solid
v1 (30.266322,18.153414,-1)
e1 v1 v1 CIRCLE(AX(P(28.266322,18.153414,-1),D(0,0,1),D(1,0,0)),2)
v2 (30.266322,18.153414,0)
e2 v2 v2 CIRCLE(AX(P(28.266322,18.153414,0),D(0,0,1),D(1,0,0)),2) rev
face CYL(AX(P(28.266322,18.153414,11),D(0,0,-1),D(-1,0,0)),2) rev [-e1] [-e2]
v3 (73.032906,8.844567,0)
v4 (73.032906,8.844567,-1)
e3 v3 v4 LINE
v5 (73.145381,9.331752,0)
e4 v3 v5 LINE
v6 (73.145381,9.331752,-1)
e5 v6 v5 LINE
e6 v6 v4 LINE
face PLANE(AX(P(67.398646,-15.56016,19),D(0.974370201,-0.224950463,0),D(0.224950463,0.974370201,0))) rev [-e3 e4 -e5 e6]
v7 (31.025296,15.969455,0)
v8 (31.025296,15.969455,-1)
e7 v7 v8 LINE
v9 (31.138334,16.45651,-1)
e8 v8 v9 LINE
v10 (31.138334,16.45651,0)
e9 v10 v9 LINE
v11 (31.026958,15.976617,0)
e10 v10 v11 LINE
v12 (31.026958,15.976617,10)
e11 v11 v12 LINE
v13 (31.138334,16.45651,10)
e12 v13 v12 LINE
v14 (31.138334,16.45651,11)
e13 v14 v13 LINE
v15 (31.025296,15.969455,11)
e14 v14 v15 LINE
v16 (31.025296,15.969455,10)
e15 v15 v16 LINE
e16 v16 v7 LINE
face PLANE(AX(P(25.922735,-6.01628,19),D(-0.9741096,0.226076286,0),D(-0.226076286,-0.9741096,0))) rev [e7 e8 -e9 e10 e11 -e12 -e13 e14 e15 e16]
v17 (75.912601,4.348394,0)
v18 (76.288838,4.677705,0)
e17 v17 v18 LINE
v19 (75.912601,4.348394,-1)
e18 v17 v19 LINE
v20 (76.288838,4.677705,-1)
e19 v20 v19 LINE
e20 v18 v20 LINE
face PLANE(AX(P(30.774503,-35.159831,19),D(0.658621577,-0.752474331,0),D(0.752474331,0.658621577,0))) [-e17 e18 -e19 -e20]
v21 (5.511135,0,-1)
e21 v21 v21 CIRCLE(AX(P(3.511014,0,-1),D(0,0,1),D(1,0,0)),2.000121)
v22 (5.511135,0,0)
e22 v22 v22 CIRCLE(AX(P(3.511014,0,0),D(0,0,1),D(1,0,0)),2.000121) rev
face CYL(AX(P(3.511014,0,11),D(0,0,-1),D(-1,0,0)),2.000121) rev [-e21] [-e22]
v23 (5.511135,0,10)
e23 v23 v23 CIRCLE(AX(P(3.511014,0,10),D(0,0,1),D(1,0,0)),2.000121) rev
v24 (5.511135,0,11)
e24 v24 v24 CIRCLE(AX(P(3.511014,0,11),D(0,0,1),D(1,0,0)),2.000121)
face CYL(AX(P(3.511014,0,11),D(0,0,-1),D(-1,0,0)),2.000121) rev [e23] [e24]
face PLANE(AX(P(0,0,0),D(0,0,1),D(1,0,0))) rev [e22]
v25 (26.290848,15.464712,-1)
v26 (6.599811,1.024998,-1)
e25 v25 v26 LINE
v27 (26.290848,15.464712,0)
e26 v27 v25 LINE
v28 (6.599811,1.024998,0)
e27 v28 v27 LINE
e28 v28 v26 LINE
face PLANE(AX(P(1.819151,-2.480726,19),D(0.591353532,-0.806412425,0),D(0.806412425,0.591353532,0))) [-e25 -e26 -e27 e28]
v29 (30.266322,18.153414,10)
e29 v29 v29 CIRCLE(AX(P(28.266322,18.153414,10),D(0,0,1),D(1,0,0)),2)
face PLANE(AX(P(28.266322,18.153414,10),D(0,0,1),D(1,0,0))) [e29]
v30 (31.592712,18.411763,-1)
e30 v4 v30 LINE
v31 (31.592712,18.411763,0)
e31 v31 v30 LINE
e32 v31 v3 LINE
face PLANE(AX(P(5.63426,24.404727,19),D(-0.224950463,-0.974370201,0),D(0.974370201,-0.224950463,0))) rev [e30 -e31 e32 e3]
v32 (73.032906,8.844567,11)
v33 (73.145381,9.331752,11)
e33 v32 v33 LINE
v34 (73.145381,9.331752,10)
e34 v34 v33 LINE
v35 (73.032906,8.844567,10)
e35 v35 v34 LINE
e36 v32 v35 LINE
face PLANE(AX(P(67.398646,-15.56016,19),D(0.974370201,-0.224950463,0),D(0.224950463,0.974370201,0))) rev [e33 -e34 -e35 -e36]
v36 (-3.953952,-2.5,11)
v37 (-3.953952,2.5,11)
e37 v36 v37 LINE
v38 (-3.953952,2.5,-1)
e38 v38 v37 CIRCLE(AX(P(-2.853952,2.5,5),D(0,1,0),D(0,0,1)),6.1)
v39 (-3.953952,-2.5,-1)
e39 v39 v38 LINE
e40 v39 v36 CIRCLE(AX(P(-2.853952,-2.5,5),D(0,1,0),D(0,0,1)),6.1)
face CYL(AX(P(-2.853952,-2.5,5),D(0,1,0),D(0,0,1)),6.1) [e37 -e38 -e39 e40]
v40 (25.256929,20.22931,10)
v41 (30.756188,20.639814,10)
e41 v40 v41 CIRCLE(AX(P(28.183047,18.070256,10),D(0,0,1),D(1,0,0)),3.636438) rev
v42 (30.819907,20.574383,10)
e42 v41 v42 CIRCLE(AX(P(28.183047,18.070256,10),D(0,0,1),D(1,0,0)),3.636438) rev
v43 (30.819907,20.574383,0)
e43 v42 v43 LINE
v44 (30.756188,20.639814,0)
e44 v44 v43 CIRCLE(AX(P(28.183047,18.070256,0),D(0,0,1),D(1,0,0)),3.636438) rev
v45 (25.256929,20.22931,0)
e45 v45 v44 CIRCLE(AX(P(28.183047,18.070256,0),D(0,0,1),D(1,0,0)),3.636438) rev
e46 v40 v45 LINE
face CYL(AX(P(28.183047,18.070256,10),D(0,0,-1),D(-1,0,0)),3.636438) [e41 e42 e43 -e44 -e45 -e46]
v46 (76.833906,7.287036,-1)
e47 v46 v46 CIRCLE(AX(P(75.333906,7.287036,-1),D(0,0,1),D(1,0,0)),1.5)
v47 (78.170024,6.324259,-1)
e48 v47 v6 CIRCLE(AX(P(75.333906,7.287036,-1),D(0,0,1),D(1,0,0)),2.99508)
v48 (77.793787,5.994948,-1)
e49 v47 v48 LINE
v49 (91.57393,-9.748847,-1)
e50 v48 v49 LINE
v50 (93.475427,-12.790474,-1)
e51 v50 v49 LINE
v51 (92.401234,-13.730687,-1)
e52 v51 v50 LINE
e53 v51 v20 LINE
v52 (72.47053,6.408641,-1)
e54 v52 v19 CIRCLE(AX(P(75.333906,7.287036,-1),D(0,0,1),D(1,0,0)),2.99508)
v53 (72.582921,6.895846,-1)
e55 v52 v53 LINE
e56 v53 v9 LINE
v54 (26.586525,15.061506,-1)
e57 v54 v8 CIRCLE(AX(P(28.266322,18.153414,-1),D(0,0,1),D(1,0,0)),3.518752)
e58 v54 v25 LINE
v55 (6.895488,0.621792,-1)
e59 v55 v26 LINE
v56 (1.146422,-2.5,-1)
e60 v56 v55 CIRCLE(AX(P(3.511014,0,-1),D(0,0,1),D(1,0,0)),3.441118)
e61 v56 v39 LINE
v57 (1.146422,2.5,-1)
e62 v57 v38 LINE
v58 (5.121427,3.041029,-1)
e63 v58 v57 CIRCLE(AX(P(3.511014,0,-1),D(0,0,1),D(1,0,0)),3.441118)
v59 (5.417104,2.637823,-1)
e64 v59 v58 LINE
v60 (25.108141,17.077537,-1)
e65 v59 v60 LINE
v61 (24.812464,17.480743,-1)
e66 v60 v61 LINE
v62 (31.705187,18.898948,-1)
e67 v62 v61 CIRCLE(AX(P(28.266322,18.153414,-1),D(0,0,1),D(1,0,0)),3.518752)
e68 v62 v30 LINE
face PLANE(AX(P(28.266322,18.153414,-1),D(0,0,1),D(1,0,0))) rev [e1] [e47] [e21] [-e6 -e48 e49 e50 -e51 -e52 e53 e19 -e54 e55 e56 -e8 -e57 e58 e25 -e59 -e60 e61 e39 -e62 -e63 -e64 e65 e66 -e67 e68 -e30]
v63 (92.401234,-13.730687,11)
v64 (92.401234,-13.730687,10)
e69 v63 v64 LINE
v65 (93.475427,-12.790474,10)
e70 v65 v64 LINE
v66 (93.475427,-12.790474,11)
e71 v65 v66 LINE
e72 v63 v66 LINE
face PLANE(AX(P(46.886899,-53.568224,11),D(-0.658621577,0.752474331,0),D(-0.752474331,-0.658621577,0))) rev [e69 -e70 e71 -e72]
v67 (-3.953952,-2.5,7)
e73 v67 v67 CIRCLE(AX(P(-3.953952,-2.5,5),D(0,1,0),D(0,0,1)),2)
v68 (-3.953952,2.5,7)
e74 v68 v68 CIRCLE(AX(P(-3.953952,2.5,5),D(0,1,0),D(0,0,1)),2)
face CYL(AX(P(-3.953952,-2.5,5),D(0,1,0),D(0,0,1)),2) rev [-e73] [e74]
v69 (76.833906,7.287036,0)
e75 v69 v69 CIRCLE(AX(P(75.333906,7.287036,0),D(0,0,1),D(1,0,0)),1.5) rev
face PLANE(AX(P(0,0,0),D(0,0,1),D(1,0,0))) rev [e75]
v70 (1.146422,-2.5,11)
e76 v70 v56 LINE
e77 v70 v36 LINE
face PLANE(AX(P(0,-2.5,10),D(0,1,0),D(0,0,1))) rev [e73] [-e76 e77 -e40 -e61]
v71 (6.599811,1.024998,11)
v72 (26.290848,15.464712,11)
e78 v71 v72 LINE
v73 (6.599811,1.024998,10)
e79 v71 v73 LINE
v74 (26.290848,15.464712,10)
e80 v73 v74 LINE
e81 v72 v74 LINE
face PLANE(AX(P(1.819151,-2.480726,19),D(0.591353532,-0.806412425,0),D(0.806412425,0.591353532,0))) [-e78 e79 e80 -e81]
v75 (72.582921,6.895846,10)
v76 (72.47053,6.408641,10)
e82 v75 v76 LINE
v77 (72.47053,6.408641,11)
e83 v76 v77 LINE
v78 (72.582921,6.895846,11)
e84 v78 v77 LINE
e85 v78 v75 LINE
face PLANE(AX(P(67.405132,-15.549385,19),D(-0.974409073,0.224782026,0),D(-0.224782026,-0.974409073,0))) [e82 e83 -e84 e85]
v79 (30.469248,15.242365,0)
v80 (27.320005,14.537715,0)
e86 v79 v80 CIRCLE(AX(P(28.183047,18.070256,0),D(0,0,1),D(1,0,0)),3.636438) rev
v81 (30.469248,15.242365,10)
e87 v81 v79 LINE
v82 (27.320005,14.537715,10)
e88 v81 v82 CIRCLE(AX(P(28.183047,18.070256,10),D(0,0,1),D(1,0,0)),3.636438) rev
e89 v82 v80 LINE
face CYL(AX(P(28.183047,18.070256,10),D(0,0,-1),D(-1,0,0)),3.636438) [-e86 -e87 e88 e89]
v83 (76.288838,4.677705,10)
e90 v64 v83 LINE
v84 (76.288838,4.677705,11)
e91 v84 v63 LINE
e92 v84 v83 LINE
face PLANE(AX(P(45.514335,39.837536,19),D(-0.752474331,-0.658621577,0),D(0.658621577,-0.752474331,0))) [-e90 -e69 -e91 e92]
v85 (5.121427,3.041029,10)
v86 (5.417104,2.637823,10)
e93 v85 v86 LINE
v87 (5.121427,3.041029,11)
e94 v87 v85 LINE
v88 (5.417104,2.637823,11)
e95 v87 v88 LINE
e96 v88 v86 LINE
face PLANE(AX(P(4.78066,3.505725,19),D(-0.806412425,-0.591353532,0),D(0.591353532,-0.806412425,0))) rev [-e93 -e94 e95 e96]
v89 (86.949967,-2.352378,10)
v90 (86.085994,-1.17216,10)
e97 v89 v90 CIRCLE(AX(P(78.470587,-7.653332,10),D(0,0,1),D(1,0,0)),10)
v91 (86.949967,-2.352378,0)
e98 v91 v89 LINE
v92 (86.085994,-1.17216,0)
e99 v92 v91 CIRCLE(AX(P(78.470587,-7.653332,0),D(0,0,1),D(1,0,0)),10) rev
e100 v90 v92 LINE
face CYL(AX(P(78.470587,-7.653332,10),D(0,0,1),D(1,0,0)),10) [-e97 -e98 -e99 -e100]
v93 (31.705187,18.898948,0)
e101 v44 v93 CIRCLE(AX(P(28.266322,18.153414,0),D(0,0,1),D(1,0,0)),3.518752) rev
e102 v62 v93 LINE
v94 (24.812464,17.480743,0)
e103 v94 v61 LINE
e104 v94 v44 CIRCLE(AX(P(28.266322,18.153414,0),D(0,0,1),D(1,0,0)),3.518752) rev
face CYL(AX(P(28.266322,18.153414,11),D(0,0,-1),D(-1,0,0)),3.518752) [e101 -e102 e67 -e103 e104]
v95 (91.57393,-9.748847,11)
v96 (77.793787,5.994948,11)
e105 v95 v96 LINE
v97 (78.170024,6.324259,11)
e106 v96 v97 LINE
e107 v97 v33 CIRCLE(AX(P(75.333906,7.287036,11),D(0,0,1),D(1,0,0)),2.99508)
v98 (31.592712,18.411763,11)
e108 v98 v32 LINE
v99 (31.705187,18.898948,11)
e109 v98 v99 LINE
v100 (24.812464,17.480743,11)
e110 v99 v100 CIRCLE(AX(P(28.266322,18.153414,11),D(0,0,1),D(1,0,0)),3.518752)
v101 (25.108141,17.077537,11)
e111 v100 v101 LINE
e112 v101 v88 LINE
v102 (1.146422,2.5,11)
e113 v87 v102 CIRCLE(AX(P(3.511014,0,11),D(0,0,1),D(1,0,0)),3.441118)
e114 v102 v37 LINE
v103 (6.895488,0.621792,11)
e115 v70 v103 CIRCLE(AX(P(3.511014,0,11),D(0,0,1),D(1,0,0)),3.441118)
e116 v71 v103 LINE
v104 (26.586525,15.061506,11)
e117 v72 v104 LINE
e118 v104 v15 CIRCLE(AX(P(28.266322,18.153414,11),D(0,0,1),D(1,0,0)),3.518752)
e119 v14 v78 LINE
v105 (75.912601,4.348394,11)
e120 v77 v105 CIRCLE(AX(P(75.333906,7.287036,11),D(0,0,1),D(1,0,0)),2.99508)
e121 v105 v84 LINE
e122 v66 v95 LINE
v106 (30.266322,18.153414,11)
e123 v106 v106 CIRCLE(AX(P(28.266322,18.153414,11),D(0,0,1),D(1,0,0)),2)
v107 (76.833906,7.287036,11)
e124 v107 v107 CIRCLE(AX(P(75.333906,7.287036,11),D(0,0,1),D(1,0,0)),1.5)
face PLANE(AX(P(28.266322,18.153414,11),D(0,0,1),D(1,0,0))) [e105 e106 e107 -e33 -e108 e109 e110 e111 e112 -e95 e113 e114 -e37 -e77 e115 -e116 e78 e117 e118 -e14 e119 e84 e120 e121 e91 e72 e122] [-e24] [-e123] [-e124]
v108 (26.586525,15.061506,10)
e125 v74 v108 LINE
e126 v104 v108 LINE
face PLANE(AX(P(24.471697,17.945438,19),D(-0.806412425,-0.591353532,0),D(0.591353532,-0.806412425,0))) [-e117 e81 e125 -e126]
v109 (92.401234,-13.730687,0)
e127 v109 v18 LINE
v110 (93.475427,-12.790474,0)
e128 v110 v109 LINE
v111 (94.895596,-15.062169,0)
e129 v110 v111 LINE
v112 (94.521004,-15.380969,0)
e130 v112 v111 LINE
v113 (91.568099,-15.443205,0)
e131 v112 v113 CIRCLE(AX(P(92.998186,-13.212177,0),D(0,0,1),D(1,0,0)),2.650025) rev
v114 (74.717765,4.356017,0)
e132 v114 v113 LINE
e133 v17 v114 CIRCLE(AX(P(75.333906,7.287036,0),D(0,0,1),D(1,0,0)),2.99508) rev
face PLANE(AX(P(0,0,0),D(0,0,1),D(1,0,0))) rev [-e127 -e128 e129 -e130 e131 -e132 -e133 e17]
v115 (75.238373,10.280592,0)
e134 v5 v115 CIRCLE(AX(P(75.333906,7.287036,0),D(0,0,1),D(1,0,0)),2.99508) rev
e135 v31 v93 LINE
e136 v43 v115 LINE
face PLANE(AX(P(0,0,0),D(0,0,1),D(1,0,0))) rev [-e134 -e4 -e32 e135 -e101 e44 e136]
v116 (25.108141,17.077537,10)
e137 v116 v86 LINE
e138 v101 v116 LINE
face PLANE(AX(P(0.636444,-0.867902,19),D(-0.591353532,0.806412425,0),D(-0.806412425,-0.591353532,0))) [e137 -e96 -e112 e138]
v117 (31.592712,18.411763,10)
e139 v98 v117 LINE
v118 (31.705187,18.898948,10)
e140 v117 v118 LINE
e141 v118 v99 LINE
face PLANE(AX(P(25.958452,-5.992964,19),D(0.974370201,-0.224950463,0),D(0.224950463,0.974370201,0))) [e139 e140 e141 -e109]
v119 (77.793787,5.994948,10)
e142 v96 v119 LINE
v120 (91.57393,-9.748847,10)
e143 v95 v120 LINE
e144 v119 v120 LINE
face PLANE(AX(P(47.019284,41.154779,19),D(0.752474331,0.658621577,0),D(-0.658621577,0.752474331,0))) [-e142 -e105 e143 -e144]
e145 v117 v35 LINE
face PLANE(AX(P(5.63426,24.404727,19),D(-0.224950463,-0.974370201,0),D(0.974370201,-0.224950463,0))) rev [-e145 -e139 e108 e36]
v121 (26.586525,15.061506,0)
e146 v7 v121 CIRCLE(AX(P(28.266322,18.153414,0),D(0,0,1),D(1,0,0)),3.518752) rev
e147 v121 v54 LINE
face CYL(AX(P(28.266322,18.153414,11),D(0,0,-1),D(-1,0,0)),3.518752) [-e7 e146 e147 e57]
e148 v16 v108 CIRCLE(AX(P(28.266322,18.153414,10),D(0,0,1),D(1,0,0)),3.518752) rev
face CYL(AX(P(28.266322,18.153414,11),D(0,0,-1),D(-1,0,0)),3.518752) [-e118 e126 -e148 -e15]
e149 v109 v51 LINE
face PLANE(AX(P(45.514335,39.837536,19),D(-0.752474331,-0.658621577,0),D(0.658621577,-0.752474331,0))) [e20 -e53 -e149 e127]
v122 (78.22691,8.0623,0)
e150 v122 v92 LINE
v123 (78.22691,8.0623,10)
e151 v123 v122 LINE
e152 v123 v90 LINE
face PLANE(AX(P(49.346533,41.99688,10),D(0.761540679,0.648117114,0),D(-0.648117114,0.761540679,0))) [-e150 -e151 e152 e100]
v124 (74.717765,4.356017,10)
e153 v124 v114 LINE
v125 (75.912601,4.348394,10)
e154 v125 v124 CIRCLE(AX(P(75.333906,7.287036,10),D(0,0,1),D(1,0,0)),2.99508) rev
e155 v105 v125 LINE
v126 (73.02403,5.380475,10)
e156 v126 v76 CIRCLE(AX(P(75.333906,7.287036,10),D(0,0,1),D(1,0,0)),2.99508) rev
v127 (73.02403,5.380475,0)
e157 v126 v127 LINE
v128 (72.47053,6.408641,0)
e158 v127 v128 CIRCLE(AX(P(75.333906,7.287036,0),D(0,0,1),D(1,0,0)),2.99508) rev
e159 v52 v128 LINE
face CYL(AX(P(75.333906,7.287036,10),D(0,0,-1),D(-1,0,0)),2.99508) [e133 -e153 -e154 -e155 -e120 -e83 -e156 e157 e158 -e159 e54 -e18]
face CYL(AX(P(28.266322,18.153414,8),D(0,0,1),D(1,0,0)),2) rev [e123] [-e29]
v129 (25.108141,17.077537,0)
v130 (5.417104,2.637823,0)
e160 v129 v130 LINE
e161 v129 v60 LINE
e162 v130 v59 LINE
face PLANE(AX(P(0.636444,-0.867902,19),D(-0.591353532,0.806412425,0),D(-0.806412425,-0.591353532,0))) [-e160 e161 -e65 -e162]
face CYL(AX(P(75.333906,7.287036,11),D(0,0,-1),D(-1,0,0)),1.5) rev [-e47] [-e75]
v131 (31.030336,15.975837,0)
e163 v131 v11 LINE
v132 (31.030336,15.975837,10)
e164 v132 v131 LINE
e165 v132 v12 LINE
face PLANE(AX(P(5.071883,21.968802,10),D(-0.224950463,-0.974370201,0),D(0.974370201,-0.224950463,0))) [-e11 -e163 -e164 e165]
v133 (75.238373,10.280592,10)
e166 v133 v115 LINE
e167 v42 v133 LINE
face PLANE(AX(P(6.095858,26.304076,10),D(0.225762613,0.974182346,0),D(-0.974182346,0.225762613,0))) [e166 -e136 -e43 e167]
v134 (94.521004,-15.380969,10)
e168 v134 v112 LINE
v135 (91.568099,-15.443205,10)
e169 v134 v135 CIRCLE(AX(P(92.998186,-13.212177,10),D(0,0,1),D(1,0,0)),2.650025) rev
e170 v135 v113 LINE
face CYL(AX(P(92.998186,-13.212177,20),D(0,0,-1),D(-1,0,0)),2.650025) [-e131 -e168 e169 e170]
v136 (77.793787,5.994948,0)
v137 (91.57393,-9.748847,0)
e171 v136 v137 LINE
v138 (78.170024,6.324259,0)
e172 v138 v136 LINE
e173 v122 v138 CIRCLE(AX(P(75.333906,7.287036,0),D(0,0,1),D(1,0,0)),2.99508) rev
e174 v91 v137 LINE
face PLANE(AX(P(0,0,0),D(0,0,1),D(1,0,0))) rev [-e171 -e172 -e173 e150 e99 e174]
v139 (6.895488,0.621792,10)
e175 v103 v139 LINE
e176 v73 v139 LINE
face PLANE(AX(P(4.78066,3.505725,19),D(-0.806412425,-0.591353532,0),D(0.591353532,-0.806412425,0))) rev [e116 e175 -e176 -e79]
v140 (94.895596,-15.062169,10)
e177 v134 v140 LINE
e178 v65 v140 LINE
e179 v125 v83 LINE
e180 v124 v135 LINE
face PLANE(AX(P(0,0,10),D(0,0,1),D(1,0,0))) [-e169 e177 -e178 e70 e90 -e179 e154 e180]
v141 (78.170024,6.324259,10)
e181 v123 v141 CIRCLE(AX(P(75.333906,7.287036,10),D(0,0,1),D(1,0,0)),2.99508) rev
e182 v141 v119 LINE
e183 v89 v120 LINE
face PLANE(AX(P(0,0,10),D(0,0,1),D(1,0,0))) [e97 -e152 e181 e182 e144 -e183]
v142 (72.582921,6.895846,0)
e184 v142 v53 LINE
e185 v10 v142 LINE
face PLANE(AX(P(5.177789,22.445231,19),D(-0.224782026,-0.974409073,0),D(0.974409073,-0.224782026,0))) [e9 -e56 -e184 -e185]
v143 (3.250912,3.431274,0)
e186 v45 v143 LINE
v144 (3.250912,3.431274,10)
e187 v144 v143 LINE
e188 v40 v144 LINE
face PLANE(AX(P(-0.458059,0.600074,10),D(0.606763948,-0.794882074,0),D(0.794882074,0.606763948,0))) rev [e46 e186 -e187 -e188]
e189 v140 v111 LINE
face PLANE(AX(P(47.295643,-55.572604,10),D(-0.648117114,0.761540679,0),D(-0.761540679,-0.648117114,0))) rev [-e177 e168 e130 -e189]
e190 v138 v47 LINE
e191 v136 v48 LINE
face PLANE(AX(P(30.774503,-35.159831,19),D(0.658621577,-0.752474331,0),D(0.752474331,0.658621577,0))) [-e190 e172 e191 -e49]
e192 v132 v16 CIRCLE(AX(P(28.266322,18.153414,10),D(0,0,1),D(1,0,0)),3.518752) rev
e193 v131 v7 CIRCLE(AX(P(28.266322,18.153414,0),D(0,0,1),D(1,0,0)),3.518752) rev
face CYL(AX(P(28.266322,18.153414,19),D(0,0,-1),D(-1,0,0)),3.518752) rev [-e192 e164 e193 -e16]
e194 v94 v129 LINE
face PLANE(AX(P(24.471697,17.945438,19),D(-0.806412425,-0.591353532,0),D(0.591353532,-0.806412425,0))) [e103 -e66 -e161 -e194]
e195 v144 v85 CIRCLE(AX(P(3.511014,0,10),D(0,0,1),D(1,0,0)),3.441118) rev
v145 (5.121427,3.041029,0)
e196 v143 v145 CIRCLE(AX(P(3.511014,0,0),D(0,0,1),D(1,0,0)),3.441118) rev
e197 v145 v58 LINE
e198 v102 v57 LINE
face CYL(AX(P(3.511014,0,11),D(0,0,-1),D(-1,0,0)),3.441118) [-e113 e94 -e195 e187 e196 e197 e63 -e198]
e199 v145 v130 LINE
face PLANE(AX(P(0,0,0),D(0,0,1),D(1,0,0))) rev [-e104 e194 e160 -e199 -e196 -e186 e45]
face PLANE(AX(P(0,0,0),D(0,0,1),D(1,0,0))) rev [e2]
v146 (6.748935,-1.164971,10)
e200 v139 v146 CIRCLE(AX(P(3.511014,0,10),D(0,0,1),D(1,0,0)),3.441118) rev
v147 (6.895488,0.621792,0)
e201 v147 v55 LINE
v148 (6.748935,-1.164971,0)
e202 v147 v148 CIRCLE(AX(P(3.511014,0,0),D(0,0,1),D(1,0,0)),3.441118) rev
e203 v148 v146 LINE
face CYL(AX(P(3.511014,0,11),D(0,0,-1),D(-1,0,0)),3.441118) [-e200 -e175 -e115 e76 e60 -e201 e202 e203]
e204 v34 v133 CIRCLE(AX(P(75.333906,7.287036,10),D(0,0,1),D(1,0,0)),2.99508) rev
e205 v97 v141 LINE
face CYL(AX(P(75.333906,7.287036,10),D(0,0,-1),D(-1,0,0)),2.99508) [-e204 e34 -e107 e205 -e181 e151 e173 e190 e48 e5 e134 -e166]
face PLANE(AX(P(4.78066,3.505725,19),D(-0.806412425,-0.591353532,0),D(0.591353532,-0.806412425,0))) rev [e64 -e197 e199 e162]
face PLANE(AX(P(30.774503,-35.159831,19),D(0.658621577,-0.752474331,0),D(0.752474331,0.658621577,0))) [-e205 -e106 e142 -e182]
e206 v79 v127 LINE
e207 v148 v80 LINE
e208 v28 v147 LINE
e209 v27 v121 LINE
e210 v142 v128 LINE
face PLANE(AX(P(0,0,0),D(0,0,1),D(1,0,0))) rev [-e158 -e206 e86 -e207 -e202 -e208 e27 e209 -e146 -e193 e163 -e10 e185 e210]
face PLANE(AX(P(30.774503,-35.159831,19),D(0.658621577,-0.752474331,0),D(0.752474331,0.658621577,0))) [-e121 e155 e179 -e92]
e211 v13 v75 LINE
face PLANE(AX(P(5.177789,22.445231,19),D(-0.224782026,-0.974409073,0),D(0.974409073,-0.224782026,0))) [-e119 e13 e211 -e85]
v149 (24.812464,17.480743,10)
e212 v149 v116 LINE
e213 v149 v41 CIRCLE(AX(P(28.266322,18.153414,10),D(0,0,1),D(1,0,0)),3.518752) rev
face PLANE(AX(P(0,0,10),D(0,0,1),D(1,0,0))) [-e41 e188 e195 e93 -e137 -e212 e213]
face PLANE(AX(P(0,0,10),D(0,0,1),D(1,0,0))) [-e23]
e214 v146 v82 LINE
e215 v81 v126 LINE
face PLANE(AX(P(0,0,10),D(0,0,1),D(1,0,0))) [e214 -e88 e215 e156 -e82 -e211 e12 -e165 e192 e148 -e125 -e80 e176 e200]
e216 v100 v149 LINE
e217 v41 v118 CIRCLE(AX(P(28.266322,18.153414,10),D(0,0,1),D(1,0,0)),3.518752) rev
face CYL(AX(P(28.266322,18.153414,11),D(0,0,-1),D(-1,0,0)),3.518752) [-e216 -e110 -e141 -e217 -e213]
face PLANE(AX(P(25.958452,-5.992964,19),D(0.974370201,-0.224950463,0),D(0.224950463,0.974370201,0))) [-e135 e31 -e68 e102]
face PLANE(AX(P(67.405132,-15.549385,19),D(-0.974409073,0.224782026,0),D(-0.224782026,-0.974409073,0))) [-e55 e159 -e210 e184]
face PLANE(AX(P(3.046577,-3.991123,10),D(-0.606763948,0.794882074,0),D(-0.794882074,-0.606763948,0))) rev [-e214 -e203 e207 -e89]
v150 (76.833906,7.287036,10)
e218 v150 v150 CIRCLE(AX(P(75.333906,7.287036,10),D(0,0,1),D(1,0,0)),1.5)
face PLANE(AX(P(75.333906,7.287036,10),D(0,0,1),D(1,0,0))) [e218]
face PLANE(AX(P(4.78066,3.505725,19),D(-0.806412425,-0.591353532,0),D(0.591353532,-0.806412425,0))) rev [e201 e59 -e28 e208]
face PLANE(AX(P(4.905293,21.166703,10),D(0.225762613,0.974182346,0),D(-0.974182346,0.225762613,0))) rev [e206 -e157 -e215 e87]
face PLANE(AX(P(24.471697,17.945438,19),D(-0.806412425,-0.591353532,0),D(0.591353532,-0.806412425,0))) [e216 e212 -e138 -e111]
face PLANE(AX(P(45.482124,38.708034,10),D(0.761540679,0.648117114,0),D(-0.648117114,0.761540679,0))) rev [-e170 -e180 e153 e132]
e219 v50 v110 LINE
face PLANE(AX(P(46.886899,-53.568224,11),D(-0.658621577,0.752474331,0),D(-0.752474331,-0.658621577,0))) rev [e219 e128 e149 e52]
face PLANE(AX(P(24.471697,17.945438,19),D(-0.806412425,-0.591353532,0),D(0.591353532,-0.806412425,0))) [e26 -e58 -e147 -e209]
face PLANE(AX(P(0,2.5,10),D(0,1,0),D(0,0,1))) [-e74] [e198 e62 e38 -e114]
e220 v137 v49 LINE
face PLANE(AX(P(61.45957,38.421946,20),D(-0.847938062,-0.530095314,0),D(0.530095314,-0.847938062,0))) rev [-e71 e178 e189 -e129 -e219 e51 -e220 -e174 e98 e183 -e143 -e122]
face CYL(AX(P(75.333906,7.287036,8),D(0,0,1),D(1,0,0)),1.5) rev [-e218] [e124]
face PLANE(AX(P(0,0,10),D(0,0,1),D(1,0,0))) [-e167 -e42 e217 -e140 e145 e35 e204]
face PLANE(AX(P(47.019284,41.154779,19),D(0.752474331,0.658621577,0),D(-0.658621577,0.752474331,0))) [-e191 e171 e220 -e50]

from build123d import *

# Parameters (mm, degrees)
AUFSATZ_LINEAR_AUSTRAGEN1_DEPTH      = 10
SKIZZE2_R                            = 2
SKIZZE2_R_2                          = 1.5
SCHNITT_LINEAR_AUSTRAGEN2_DEPTH      = 2
AUFSATZ_LINEAR_AUSTRAGEN3_DEPTH      = 1
AUFSATZ_LINEAR_AUSTRAGEN3_DEPTH_BACK = 11
SKIZZE3_R                            = 3.518752121
SKIZZE3_R_2                          = 2
SKIZZE3_R_3                          = 2.995079886
SKIZZE3_R_4                          = 1.5
SKIZZE3_R_5                          = 3.44111782
SKIZZE3_R_6                          = 2.0001213
AUFSATZ_LINEAR_START                 = 2
SKIZZE5_R                            = 2
SKIZZE5_R_2                          = 1.5
AUFSATZ_LINEAR_AUSTRAGEN4_DEPTH      = 2
AUFSATZ_LINEAR_AUSTRAGEN5_DEPTH      = 1
AUFSATZ_LINEAR_AUSTRAGEN5_DEPTH_BACK = 11
SCHNITT_LINEAR_START                 = -10
SCHNITT_LINEAR_AUSTRAGEN3_DEPTH      = 10
SCHNITT_LINEAR_AUSTRAGEN4_DEPTH      = 16
VERRUNDUNG1_R                        = 10
AUFSATZ_LINEAR_AUSTRAGEN7_DEPTH      = 5
AUFSATZ_LINEAR_AUSTRAGEN8_DEPTH      = 5
SCHNITT_LINEAR_AUSTRAGEN5_DEPTH      = 5
SCHNITT_LINEAR_START_2               = -12
SCHNITT_LINEAR_AUSTRAGEN6_DEPTH      = 12
AUFSATZ_LINEAR_AUSTRAGEN9_DEPTH      = 10
AUFSATZ_LINEAR_AUSTRAGEN10_DEPTH     = 5
SKIZZE15_R                           = 2
SCHNITT_LINEAR_AUSTRAGEN7_DEPTH      = 5


# Read off the part's stored shape, not the designer's step: Schnitt-Linear austragen3, Schnitt-Linear austragen6
with BuildPart() as part:
    # Skizze1 → Aufsatz-Linear austragen1 (new body)
    with BuildSketch(Plane.XY):
        with BuildLine():
            ThreePointArc((78.226909956, 8.062300015), (77.119029653, 9.691997481), (75.238373147, 10.280592164))
            Line((75.238373147, 10.280592164), (30.819907125, 20.574382651))
            ThreePointArc((30.819907125, 20.574382651), (27.95791063, 21.699717961), (25.256928729, 20.229309765))
            Line((25.256928729, 20.229309765), (2.03091053, 2.5))
            Line((2.03091053, 2.5), (-5, 2.5))
            Line((-5, 2.5), (-5, -2.5))
            Line((-5, -2.5), (5, -2.5))
            Line((5, -2.5), (27.32000509, 14.537715238))
            ThreePointArc((27.32000509, 14.537715238), (28.977073767, 14.52156508), (30.469248409, 15.242364824))
            Line((30.469248409, 15.242364824), (73.024030057, 5.38047526))
            ThreePointArc((73.024030057, 5.38047526), (73.783818165, 4.724277979), (74.717765038, 4.356017096))
            Line((74.717765038, 4.356017096), (91.568099076, -15.443205221))
            ThreePointArc((91.568099076, -15.443205221), (92.552334962, -16.00997429), (93.685100527, -16.092373528))
            Line((93.685100527, -16.092373528), (94.89559552, -15.062169177))
            Line((94.89559552, -15.062169177), (94.89559552, -11.523484486))
            Line((94.89559552, -11.523484486), (78.226909956, 8.062300015))
        make_face()
    extrude(amount=AUFSATZ_LINEAR_AUSTRAGEN1_DEPTH)

    # Skizze2 → Schnitt-Linear austragen2 (cut)
    with BuildSketch(Plane.XY.offset(10)):
        with Locations((28.266321665, 18.153414303)):
            Circle(SKIZZE2_R)
        with Locations((75.333906388, 7.287036264)):
            Circle(SKIZZE2_R_2)
    extrude(amount=-SCHNITT_LINEAR_AUSTRAGEN2_DEPTH, mode=Mode.SUBTRACT)

    # Skizze3 → Aufsatz-Linear austragen3 (add, two sides: drawn at the far end of the back side and taken through both)
    # profile 1 of 3: a face of its own
    with BuildSketch(Plane.XY.offset(10).offset(-AUFSATZ_LINEAR_AUSTRAGEN3_DEPTH_BACK)):
        with Locations(Location((28.266321665, 18.153414303, 0), (0, 0, 44.962482981))):
            Circle(SKIZZE3_R)
        with Locations((28.266321665, 18.153414303)):
            Circle(SKIZZE3_R_2, mode=Mode.SUBTRACT)
    # profile 2 of 3: a face of its own
    with BuildSketch(Plane.XY.offset(10).offset(-AUFSATZ_LINEAR_AUSTRAGEN3_DEPTH_BACK)):
        with Locations((75.333906388, 7.287036264)):
            Circle(SKIZZE3_R_3)
        with Locations((75.333906388, 7.287036264)):
            Circle(SKIZZE3_R_4, mode=Mode.SUBTRACT)
    # profile 3 of 3: a face of its own
    with BuildSketch(Plane.XY.offset(10).offset(-AUFSATZ_LINEAR_AUSTRAGEN3_DEPTH_BACK)):
        with Locations((3.511013625, 0)):
            Circle(SKIZZE3_R_5)
        with Locations((3.511013625, 0)):
            Circle(SKIZZE3_R_6, mode=Mode.SUBTRACT)
    extrude(amount=AUFSATZ_LINEAR_AUSTRAGEN3_DEPTH + AUFSATZ_LINEAR_AUSTRAGEN3_DEPTH_BACK)

    # Skizze5 → Aufsatz-Linear austragen4 (add)
    with BuildSketch(Plane.XY.offset(8).offset(AUFSATZ_LINEAR_START)):
        with Locations((28.266321665, 18.153414303)):
            Circle(SKIZZE5_R)
        with Locations((75.333906388, 7.287036264)):
            Circle(SKIZZE5_R_2)
    extrude(amount=-AUFSATZ_LINEAR_AUSTRAGEN4_DEPTH)

    # Skizze6 → Aufsatz-Linear austragen5 (add, two sides: drawn at the far end of the back side and taken through both)
    with BuildSketch(Plane.XY.offset(10).offset(-AUFSATZ_LINEAR_AUSTRAGEN5_DEPTH_BACK)):
        with BuildLine():
            ThreePointArc((5.121427356, 3.041029343), (5.76066726, 2.603910592), (6.285973792, 2.034917178))
            Line((6.285973792, 2.034917178), (25.428756233, 16.072587806))
            ThreePointArc((25.428756233, 16.072587806), (25.042779389, 16.742601882), (24.812464466, 17.480742804))
            Line((24.812464466, 17.480742804), (5.121427356, 3.041029343))
        make_face()
        with BuildLine():
            Line((25.428756233, 16.072587806), (6.285973792, 2.034917178))
            ThreePointArc((6.285973792, 2.034917178), (6.670742881, 1.362865688), (6.895487953, 0.621792068))
            Line((6.895487953, 0.621792068), (26.586525064, 15.061505529))
            ThreePointArc((26.586525064, 15.061505529), (25.951756527, 15.503054948), (25.428756233, 16.072587806))
        make_face()
        with BuildLine():
            Line((73.145381206, 9.33175166), (31.705187224, 18.898947778))
            ThreePointArc((31.705187224, 18.898947778), (31.765045144, 18.528314965), (31.785073786, 18.153414303))
            ThreePointArc((31.785073786, 18.153414303), (31.762454861, 17.755081316), (31.694888878, 17.361869386))
            Line((31.694888878, 17.361869386), (72.415589796, 7.96078087))
            ThreePointArc((72.415589796, 7.96078087), (72.690074235, 8.694393742), (73.145381206, 9.33175166))
        make_face()
        with BuildLine():
            ThreePointArc((31.694888878, 17.361869386), (31.439220556, 16.632122379), (31.030335836, 15.975837174))
            Line((31.030335836, 15.975837174), (72.470529818, 6.408641056))
            ThreePointArc((72.470529818, 6.408641056), (72.340701006, 7.181087839), (72.415589796, 7.96078087))
            Line((72.415589796, 7.96078087), (31.694888878, 17.361869386))
        make_face()
        Polygon((77.783811226, 6.765506884), (76.65509973, 5.777574519), (78.557461472, 3.604128601), (79.686172968, 4.592060966), align=None)
        Polygon((78.557461472, 3.604128601), (76.65509973, 5.777574519), (75.526388234, 4.789642153), (77.428749976, 2.616196235), align=None)
        Polygon((79.686172968, 4.592060966), (78.557461472, 3.604128601), (93.153708804, -13.072065775), (94.2824203, -12.084133409), align=None)
        Polygon((93.153708804, -13.072065775), (78.557461472, 3.604128601), (77.428749976, 2.616196235), (92.024997308, -14.059998141), align=None)
    extrude(amount=AUFSATZ_LINEAR_AUSTRAGEN5_DEPTH + AUFSATZ_LINEAR_AUSTRAGEN5_DEPTH_BACK)

    # Schnitt-Linear austragen3 outline → Schnitt-Linear austragen3 (cut)
    with BuildSketch(Plane.XY.offset(10).offset(SCHNITT_LINEAR_START)):
        Polygon((89.9130967, -7.092186645), (94.2824203, -12.084133409), (93.475427, -12.790474049), (94.89559552, -15.062169177), (94.89559552, -11.523484486), (86.561252738, -1.730592235), align=None)
        with BuildLine():
            Line((93.685100527, -16.092373528), (94.521004046, -15.380969147))
            ThreePointArc((94.521004046, -15.380969147), (93.054025889, -15.861614081), (91.568099076, -15.443205221))
            ThreePointArc((91.568099076, -15.443205221), (92.552334963, -16.00997429), (93.685100527, -16.092373528))
        make_face()
    extrude(amount=SCHNITT_LINEAR_AUSTRAGEN3_DEPTH, mode=Mode.SUBTRACT)

    # Skizze8 → Schnitt-Linear austragen4 (cut)
    with BuildSketch(Plane.XY.offset(11)):
        Polygon((89.9130967, -7.092186645), (93.475427, -12.790474049), (94.2824203, -12.084133409), align=None)
    extrude(amount=-SCHNITT_LINEAR_AUSTRAGEN4_DEPTH, mode=Mode.SUBTRACT)

    # Verrundung1
    verrundung1_edges = [part.edges().sort_by_distance(p)[0] for p in [
        (86.561252738, -1.730592235, 5),
    ]]
    fillet(verrundung1_edges, radius=VERRUNDUNG1_R)

    # Skizze9 → Aufsatz-Linear austragen7 (add)
    with BuildSketch(Plane(origin=(0, 2.5, 0), x_dir=(1, 0, 0), z_dir=(0, 1, 0))):
        with BuildLine():
            ThreePointArc((-8.85357764, -5.013698687), (-7.773533749, -8.117558236), (-5, -9.880495968))
            Line((-5, -9.880495968), (-5, -5.013698687))
            Line((-5, -5.013698687), (-8.85357764, -5.013698687))
        make_face()
        with BuildLine():
            Line((-5, -5.013698687), (-5, -0.146901406))
            ThreePointArc((-5, -0.146901406), (-7.773533749, -1.909839138), (-8.85357764, -5.013698687))
            Line((-8.85357764, -5.013698687), (-5, -5.013698687))
        make_face()
    extrude(amount=-AUFSATZ_LINEAR_AUSTRAGEN7_DEPTH)

    # Skizze10 → Aufsatz-Linear austragen8 (add)
    with BuildSketch(Plane(origin=(0, 2.5, 0), x_dir=(1, 0, 0), z_dir=(0, 1, 0))):
        with BuildLine():
            Line((-5, 0), (-5, -10))
            ThreePointArc((-5, -10), (-8.953952482, -5), (-5, 0))
        make_face()
    extrude(amount=-AUFSATZ_LINEAR_AUSTRAGEN8_DEPTH)

    # Skizze11 → Schnitt-Linear austragen5 (cut)
    with BuildSketch(Plane(origin=(0, 2.5, 0), x_dir=(1, 0, 0), z_dir=(0, 1, 0))):
        with BuildLine():
            ThreePointArc((-1.953952482, -5), (-2.539738919, -3.585786438), (-3.953952482, -3))
            Line((-3.953952482, -3), (-3.953952482, -5))
            Line((-3.953952482, -5), (-3.953952482, -7))
            ThreePointArc((-3.953952482, -7), (-2.539738919, -6.414213562), (-1.953952482, -5))
        make_face()
        with BuildLine():
            Line((-3.953952482, -5), (-3.953952482, -3))
            ThreePointArc((-3.953952482, -3), (-5.368166044, -3.585786438), (-5.953952482, -5))
            Line((-5.953952482, -5), (-3.953952482, -5))
        make_face()
        with BuildLine():
            Line((-3.953952482, -7), (-3.953952482, -5))
            Line((-3.953952482, -5), (-5.953952482, -5))
            ThreePointArc((-5.953952482, -5), (-5.368166044, -6.414213562), (-3.953952482, -7))
        make_face()
    extrude(amount=-SCHNITT_LINEAR_AUSTRAGEN5_DEPTH, mode=Mode.SUBTRACT)

    # Schnitt-Linear austragen6 outline → Schnitt-Linear austragen6 (cut)
    with BuildSketch(Plane(origin=(0, 0, -1), x_dir=(-1, 0, 0), z_dir=(0, 0, -1)).offset(SCHNITT_LINEAR_START_2)):
        Polygon((-77.793786947, 5.994948355), (-78.170024112, 6.324259144), (-89.9130967, -7.092186645), (-91.57392964, -9.748847489), align=None)
        Polygon((-76.288838286, 4.677705201), (-92.401234473, -13.730687352), (-92.024997308, -14.059998141), (-75.91260112, 4.348394412), align=None)
        with BuildLine():
            Line((-72.582920831, 6.895845592), (-72.470529818, 6.408641056))
            Line((-72.470529818, 6.408641056), (-31.030335836, 15.975837174))
            ThreePointArc((-31.030335836, 15.975837174), (-31.027817601, 15.972644557), (-31.025295678, 15.969454852))
            Line((-31.025295678, 15.969454852), (-31.138333921, 16.456510082))
            Line((-31.138333921, 16.456510082), (-72.582920831, 6.895845592))
        make_face()
        Polygon((-31.592711992, 18.411762677), (-31.705187224, 18.898947778), (-73.145381206, 9.33175166), (-73.032905974, 8.84456656), align=None)
        Polygon((-26.290848297, 15.464711741), (-26.586525064, 15.061505529), (-6.895487953, 0.621792068), (-6.599811187, 1.02499828), align=None)
        Polygon((-25.108141233, 17.077536592), (-5.417104122, 2.637823131), (-5.121427356, 3.041029343), (-24.812464466, 17.480742804), align=None)
    extrude(amount=SCHNITT_LINEAR_AUSTRAGEN6_DEPTH, mode=Mode.SUBTRACT)

    # Skizze13 → Aufsatz-Linear austragen9 (add)
    with BuildSketch(Plane(origin=(0, 0, 0), x_dir=(-1, 0, 0), z_dir=(0, 0, -1))):
        Polygon((-72.470529818, 6.408641056), (-30.276833668, 16.149796374), (-30.951685056, 19.072906978), (-73.145381206, 9.33175166), align=None)
        Polygon((-4.770111289, 2.783404349), (-6.544171886, 0.364167073), (-26.586525064, 15.061505529), (-24.812464466, 17.480742804), align=None)
        Polygon((-89.387726685, -6.251807151), (-91.57392964, -9.748847489), (-77.793786947, 5.994948355), (-78.170024112, 6.324259144), align=None)
        Polygon((-92.401234473, -13.730687352), (-92.024997308, -14.059998141), (-75.91260112, 4.348394412), (-75.457587491, 4.868246916), (-75.833824656, 5.197557705), align=None)
    extrude(amount=-AUFSATZ_LINEAR_AUSTRAGEN9_DEPTH)

    # Skizze14 → Aufsatz-Linear austragen10 (add)
    with BuildSketch(Plane(origin=(0, 2.5, 0), x_dir=(1, 0, 0), z_dir=(0, 1, 0))):
        with BuildLine():
            Line((-5, 0), (1.14642236, 0))
            Line((1.14642236, 0), (1.14642236, 1))
            Line((1.14642236, 1), (-5, 1))
            ThreePointArc((-5, 1), (-7.876578934, -1.407168944), (-8.95395245, -5))
            ThreePointArc((-8.953952482, -5), (-7.846018042, -1.812770003), (-5, 0))
        make_face()
        with BuildLine():
            Line((1.14642236, -11), (1.14642236, -10))
            Line((1.14642236, -10), (-5, -10))
            ThreePointArc((-5, -10), (-7.846018042, -8.187229997), (-8.953952482, -5))
            ThreePointArc((-8.95395245, -5), (-7.876578934, -8.592831056), (-5, -11))
            Line((-5, -11), (1.14642236, -11))
        make_face()
    extrude(amount=-AUFSATZ_LINEAR_AUSTRAGEN10_DEPTH)

    # Skizze15 → Schnitt-Linear austragen7 (cut)
    with BuildSketch(Plane(origin=(0, 2.5, 0), x_dir=(1, 0, 0), z_dir=(0, 1, 0))):
        with BuildLine():
            ThreePointArc((-8.95395245, -4.999999793), (-7.5401022, -1.094875093), (-3.953952482, 1))
            Line((-3.953952482, 1), (-5, 1))
            ThreePointArc((-5, 1), (-7.876578877, -1.407168858), (-8.95395245, -4.999999793))
        make_face()
        with BuildLine():
            ThreePointArc((-3.953952482, -11), (-7.540102332, -8.905124748), (-8.95395245, -4.999999793))
            ThreePointArc((-8.95395245, -4.999999793), (-7.87657899, -8.592830969), (-5, -11))
            Line((-5, -11), (-3.953952482, -11))
        make_face()
        with Locations(Location((-3.953952482, -5, 0), (0, 0, 270))):
            Circle(SKIZZE15_R)
    extrude(amount=-SCHNITT_LINEAR_AUSTRAGEN7_DEPTH, mode=Mode.SUBTRACT)


solid = part.part
